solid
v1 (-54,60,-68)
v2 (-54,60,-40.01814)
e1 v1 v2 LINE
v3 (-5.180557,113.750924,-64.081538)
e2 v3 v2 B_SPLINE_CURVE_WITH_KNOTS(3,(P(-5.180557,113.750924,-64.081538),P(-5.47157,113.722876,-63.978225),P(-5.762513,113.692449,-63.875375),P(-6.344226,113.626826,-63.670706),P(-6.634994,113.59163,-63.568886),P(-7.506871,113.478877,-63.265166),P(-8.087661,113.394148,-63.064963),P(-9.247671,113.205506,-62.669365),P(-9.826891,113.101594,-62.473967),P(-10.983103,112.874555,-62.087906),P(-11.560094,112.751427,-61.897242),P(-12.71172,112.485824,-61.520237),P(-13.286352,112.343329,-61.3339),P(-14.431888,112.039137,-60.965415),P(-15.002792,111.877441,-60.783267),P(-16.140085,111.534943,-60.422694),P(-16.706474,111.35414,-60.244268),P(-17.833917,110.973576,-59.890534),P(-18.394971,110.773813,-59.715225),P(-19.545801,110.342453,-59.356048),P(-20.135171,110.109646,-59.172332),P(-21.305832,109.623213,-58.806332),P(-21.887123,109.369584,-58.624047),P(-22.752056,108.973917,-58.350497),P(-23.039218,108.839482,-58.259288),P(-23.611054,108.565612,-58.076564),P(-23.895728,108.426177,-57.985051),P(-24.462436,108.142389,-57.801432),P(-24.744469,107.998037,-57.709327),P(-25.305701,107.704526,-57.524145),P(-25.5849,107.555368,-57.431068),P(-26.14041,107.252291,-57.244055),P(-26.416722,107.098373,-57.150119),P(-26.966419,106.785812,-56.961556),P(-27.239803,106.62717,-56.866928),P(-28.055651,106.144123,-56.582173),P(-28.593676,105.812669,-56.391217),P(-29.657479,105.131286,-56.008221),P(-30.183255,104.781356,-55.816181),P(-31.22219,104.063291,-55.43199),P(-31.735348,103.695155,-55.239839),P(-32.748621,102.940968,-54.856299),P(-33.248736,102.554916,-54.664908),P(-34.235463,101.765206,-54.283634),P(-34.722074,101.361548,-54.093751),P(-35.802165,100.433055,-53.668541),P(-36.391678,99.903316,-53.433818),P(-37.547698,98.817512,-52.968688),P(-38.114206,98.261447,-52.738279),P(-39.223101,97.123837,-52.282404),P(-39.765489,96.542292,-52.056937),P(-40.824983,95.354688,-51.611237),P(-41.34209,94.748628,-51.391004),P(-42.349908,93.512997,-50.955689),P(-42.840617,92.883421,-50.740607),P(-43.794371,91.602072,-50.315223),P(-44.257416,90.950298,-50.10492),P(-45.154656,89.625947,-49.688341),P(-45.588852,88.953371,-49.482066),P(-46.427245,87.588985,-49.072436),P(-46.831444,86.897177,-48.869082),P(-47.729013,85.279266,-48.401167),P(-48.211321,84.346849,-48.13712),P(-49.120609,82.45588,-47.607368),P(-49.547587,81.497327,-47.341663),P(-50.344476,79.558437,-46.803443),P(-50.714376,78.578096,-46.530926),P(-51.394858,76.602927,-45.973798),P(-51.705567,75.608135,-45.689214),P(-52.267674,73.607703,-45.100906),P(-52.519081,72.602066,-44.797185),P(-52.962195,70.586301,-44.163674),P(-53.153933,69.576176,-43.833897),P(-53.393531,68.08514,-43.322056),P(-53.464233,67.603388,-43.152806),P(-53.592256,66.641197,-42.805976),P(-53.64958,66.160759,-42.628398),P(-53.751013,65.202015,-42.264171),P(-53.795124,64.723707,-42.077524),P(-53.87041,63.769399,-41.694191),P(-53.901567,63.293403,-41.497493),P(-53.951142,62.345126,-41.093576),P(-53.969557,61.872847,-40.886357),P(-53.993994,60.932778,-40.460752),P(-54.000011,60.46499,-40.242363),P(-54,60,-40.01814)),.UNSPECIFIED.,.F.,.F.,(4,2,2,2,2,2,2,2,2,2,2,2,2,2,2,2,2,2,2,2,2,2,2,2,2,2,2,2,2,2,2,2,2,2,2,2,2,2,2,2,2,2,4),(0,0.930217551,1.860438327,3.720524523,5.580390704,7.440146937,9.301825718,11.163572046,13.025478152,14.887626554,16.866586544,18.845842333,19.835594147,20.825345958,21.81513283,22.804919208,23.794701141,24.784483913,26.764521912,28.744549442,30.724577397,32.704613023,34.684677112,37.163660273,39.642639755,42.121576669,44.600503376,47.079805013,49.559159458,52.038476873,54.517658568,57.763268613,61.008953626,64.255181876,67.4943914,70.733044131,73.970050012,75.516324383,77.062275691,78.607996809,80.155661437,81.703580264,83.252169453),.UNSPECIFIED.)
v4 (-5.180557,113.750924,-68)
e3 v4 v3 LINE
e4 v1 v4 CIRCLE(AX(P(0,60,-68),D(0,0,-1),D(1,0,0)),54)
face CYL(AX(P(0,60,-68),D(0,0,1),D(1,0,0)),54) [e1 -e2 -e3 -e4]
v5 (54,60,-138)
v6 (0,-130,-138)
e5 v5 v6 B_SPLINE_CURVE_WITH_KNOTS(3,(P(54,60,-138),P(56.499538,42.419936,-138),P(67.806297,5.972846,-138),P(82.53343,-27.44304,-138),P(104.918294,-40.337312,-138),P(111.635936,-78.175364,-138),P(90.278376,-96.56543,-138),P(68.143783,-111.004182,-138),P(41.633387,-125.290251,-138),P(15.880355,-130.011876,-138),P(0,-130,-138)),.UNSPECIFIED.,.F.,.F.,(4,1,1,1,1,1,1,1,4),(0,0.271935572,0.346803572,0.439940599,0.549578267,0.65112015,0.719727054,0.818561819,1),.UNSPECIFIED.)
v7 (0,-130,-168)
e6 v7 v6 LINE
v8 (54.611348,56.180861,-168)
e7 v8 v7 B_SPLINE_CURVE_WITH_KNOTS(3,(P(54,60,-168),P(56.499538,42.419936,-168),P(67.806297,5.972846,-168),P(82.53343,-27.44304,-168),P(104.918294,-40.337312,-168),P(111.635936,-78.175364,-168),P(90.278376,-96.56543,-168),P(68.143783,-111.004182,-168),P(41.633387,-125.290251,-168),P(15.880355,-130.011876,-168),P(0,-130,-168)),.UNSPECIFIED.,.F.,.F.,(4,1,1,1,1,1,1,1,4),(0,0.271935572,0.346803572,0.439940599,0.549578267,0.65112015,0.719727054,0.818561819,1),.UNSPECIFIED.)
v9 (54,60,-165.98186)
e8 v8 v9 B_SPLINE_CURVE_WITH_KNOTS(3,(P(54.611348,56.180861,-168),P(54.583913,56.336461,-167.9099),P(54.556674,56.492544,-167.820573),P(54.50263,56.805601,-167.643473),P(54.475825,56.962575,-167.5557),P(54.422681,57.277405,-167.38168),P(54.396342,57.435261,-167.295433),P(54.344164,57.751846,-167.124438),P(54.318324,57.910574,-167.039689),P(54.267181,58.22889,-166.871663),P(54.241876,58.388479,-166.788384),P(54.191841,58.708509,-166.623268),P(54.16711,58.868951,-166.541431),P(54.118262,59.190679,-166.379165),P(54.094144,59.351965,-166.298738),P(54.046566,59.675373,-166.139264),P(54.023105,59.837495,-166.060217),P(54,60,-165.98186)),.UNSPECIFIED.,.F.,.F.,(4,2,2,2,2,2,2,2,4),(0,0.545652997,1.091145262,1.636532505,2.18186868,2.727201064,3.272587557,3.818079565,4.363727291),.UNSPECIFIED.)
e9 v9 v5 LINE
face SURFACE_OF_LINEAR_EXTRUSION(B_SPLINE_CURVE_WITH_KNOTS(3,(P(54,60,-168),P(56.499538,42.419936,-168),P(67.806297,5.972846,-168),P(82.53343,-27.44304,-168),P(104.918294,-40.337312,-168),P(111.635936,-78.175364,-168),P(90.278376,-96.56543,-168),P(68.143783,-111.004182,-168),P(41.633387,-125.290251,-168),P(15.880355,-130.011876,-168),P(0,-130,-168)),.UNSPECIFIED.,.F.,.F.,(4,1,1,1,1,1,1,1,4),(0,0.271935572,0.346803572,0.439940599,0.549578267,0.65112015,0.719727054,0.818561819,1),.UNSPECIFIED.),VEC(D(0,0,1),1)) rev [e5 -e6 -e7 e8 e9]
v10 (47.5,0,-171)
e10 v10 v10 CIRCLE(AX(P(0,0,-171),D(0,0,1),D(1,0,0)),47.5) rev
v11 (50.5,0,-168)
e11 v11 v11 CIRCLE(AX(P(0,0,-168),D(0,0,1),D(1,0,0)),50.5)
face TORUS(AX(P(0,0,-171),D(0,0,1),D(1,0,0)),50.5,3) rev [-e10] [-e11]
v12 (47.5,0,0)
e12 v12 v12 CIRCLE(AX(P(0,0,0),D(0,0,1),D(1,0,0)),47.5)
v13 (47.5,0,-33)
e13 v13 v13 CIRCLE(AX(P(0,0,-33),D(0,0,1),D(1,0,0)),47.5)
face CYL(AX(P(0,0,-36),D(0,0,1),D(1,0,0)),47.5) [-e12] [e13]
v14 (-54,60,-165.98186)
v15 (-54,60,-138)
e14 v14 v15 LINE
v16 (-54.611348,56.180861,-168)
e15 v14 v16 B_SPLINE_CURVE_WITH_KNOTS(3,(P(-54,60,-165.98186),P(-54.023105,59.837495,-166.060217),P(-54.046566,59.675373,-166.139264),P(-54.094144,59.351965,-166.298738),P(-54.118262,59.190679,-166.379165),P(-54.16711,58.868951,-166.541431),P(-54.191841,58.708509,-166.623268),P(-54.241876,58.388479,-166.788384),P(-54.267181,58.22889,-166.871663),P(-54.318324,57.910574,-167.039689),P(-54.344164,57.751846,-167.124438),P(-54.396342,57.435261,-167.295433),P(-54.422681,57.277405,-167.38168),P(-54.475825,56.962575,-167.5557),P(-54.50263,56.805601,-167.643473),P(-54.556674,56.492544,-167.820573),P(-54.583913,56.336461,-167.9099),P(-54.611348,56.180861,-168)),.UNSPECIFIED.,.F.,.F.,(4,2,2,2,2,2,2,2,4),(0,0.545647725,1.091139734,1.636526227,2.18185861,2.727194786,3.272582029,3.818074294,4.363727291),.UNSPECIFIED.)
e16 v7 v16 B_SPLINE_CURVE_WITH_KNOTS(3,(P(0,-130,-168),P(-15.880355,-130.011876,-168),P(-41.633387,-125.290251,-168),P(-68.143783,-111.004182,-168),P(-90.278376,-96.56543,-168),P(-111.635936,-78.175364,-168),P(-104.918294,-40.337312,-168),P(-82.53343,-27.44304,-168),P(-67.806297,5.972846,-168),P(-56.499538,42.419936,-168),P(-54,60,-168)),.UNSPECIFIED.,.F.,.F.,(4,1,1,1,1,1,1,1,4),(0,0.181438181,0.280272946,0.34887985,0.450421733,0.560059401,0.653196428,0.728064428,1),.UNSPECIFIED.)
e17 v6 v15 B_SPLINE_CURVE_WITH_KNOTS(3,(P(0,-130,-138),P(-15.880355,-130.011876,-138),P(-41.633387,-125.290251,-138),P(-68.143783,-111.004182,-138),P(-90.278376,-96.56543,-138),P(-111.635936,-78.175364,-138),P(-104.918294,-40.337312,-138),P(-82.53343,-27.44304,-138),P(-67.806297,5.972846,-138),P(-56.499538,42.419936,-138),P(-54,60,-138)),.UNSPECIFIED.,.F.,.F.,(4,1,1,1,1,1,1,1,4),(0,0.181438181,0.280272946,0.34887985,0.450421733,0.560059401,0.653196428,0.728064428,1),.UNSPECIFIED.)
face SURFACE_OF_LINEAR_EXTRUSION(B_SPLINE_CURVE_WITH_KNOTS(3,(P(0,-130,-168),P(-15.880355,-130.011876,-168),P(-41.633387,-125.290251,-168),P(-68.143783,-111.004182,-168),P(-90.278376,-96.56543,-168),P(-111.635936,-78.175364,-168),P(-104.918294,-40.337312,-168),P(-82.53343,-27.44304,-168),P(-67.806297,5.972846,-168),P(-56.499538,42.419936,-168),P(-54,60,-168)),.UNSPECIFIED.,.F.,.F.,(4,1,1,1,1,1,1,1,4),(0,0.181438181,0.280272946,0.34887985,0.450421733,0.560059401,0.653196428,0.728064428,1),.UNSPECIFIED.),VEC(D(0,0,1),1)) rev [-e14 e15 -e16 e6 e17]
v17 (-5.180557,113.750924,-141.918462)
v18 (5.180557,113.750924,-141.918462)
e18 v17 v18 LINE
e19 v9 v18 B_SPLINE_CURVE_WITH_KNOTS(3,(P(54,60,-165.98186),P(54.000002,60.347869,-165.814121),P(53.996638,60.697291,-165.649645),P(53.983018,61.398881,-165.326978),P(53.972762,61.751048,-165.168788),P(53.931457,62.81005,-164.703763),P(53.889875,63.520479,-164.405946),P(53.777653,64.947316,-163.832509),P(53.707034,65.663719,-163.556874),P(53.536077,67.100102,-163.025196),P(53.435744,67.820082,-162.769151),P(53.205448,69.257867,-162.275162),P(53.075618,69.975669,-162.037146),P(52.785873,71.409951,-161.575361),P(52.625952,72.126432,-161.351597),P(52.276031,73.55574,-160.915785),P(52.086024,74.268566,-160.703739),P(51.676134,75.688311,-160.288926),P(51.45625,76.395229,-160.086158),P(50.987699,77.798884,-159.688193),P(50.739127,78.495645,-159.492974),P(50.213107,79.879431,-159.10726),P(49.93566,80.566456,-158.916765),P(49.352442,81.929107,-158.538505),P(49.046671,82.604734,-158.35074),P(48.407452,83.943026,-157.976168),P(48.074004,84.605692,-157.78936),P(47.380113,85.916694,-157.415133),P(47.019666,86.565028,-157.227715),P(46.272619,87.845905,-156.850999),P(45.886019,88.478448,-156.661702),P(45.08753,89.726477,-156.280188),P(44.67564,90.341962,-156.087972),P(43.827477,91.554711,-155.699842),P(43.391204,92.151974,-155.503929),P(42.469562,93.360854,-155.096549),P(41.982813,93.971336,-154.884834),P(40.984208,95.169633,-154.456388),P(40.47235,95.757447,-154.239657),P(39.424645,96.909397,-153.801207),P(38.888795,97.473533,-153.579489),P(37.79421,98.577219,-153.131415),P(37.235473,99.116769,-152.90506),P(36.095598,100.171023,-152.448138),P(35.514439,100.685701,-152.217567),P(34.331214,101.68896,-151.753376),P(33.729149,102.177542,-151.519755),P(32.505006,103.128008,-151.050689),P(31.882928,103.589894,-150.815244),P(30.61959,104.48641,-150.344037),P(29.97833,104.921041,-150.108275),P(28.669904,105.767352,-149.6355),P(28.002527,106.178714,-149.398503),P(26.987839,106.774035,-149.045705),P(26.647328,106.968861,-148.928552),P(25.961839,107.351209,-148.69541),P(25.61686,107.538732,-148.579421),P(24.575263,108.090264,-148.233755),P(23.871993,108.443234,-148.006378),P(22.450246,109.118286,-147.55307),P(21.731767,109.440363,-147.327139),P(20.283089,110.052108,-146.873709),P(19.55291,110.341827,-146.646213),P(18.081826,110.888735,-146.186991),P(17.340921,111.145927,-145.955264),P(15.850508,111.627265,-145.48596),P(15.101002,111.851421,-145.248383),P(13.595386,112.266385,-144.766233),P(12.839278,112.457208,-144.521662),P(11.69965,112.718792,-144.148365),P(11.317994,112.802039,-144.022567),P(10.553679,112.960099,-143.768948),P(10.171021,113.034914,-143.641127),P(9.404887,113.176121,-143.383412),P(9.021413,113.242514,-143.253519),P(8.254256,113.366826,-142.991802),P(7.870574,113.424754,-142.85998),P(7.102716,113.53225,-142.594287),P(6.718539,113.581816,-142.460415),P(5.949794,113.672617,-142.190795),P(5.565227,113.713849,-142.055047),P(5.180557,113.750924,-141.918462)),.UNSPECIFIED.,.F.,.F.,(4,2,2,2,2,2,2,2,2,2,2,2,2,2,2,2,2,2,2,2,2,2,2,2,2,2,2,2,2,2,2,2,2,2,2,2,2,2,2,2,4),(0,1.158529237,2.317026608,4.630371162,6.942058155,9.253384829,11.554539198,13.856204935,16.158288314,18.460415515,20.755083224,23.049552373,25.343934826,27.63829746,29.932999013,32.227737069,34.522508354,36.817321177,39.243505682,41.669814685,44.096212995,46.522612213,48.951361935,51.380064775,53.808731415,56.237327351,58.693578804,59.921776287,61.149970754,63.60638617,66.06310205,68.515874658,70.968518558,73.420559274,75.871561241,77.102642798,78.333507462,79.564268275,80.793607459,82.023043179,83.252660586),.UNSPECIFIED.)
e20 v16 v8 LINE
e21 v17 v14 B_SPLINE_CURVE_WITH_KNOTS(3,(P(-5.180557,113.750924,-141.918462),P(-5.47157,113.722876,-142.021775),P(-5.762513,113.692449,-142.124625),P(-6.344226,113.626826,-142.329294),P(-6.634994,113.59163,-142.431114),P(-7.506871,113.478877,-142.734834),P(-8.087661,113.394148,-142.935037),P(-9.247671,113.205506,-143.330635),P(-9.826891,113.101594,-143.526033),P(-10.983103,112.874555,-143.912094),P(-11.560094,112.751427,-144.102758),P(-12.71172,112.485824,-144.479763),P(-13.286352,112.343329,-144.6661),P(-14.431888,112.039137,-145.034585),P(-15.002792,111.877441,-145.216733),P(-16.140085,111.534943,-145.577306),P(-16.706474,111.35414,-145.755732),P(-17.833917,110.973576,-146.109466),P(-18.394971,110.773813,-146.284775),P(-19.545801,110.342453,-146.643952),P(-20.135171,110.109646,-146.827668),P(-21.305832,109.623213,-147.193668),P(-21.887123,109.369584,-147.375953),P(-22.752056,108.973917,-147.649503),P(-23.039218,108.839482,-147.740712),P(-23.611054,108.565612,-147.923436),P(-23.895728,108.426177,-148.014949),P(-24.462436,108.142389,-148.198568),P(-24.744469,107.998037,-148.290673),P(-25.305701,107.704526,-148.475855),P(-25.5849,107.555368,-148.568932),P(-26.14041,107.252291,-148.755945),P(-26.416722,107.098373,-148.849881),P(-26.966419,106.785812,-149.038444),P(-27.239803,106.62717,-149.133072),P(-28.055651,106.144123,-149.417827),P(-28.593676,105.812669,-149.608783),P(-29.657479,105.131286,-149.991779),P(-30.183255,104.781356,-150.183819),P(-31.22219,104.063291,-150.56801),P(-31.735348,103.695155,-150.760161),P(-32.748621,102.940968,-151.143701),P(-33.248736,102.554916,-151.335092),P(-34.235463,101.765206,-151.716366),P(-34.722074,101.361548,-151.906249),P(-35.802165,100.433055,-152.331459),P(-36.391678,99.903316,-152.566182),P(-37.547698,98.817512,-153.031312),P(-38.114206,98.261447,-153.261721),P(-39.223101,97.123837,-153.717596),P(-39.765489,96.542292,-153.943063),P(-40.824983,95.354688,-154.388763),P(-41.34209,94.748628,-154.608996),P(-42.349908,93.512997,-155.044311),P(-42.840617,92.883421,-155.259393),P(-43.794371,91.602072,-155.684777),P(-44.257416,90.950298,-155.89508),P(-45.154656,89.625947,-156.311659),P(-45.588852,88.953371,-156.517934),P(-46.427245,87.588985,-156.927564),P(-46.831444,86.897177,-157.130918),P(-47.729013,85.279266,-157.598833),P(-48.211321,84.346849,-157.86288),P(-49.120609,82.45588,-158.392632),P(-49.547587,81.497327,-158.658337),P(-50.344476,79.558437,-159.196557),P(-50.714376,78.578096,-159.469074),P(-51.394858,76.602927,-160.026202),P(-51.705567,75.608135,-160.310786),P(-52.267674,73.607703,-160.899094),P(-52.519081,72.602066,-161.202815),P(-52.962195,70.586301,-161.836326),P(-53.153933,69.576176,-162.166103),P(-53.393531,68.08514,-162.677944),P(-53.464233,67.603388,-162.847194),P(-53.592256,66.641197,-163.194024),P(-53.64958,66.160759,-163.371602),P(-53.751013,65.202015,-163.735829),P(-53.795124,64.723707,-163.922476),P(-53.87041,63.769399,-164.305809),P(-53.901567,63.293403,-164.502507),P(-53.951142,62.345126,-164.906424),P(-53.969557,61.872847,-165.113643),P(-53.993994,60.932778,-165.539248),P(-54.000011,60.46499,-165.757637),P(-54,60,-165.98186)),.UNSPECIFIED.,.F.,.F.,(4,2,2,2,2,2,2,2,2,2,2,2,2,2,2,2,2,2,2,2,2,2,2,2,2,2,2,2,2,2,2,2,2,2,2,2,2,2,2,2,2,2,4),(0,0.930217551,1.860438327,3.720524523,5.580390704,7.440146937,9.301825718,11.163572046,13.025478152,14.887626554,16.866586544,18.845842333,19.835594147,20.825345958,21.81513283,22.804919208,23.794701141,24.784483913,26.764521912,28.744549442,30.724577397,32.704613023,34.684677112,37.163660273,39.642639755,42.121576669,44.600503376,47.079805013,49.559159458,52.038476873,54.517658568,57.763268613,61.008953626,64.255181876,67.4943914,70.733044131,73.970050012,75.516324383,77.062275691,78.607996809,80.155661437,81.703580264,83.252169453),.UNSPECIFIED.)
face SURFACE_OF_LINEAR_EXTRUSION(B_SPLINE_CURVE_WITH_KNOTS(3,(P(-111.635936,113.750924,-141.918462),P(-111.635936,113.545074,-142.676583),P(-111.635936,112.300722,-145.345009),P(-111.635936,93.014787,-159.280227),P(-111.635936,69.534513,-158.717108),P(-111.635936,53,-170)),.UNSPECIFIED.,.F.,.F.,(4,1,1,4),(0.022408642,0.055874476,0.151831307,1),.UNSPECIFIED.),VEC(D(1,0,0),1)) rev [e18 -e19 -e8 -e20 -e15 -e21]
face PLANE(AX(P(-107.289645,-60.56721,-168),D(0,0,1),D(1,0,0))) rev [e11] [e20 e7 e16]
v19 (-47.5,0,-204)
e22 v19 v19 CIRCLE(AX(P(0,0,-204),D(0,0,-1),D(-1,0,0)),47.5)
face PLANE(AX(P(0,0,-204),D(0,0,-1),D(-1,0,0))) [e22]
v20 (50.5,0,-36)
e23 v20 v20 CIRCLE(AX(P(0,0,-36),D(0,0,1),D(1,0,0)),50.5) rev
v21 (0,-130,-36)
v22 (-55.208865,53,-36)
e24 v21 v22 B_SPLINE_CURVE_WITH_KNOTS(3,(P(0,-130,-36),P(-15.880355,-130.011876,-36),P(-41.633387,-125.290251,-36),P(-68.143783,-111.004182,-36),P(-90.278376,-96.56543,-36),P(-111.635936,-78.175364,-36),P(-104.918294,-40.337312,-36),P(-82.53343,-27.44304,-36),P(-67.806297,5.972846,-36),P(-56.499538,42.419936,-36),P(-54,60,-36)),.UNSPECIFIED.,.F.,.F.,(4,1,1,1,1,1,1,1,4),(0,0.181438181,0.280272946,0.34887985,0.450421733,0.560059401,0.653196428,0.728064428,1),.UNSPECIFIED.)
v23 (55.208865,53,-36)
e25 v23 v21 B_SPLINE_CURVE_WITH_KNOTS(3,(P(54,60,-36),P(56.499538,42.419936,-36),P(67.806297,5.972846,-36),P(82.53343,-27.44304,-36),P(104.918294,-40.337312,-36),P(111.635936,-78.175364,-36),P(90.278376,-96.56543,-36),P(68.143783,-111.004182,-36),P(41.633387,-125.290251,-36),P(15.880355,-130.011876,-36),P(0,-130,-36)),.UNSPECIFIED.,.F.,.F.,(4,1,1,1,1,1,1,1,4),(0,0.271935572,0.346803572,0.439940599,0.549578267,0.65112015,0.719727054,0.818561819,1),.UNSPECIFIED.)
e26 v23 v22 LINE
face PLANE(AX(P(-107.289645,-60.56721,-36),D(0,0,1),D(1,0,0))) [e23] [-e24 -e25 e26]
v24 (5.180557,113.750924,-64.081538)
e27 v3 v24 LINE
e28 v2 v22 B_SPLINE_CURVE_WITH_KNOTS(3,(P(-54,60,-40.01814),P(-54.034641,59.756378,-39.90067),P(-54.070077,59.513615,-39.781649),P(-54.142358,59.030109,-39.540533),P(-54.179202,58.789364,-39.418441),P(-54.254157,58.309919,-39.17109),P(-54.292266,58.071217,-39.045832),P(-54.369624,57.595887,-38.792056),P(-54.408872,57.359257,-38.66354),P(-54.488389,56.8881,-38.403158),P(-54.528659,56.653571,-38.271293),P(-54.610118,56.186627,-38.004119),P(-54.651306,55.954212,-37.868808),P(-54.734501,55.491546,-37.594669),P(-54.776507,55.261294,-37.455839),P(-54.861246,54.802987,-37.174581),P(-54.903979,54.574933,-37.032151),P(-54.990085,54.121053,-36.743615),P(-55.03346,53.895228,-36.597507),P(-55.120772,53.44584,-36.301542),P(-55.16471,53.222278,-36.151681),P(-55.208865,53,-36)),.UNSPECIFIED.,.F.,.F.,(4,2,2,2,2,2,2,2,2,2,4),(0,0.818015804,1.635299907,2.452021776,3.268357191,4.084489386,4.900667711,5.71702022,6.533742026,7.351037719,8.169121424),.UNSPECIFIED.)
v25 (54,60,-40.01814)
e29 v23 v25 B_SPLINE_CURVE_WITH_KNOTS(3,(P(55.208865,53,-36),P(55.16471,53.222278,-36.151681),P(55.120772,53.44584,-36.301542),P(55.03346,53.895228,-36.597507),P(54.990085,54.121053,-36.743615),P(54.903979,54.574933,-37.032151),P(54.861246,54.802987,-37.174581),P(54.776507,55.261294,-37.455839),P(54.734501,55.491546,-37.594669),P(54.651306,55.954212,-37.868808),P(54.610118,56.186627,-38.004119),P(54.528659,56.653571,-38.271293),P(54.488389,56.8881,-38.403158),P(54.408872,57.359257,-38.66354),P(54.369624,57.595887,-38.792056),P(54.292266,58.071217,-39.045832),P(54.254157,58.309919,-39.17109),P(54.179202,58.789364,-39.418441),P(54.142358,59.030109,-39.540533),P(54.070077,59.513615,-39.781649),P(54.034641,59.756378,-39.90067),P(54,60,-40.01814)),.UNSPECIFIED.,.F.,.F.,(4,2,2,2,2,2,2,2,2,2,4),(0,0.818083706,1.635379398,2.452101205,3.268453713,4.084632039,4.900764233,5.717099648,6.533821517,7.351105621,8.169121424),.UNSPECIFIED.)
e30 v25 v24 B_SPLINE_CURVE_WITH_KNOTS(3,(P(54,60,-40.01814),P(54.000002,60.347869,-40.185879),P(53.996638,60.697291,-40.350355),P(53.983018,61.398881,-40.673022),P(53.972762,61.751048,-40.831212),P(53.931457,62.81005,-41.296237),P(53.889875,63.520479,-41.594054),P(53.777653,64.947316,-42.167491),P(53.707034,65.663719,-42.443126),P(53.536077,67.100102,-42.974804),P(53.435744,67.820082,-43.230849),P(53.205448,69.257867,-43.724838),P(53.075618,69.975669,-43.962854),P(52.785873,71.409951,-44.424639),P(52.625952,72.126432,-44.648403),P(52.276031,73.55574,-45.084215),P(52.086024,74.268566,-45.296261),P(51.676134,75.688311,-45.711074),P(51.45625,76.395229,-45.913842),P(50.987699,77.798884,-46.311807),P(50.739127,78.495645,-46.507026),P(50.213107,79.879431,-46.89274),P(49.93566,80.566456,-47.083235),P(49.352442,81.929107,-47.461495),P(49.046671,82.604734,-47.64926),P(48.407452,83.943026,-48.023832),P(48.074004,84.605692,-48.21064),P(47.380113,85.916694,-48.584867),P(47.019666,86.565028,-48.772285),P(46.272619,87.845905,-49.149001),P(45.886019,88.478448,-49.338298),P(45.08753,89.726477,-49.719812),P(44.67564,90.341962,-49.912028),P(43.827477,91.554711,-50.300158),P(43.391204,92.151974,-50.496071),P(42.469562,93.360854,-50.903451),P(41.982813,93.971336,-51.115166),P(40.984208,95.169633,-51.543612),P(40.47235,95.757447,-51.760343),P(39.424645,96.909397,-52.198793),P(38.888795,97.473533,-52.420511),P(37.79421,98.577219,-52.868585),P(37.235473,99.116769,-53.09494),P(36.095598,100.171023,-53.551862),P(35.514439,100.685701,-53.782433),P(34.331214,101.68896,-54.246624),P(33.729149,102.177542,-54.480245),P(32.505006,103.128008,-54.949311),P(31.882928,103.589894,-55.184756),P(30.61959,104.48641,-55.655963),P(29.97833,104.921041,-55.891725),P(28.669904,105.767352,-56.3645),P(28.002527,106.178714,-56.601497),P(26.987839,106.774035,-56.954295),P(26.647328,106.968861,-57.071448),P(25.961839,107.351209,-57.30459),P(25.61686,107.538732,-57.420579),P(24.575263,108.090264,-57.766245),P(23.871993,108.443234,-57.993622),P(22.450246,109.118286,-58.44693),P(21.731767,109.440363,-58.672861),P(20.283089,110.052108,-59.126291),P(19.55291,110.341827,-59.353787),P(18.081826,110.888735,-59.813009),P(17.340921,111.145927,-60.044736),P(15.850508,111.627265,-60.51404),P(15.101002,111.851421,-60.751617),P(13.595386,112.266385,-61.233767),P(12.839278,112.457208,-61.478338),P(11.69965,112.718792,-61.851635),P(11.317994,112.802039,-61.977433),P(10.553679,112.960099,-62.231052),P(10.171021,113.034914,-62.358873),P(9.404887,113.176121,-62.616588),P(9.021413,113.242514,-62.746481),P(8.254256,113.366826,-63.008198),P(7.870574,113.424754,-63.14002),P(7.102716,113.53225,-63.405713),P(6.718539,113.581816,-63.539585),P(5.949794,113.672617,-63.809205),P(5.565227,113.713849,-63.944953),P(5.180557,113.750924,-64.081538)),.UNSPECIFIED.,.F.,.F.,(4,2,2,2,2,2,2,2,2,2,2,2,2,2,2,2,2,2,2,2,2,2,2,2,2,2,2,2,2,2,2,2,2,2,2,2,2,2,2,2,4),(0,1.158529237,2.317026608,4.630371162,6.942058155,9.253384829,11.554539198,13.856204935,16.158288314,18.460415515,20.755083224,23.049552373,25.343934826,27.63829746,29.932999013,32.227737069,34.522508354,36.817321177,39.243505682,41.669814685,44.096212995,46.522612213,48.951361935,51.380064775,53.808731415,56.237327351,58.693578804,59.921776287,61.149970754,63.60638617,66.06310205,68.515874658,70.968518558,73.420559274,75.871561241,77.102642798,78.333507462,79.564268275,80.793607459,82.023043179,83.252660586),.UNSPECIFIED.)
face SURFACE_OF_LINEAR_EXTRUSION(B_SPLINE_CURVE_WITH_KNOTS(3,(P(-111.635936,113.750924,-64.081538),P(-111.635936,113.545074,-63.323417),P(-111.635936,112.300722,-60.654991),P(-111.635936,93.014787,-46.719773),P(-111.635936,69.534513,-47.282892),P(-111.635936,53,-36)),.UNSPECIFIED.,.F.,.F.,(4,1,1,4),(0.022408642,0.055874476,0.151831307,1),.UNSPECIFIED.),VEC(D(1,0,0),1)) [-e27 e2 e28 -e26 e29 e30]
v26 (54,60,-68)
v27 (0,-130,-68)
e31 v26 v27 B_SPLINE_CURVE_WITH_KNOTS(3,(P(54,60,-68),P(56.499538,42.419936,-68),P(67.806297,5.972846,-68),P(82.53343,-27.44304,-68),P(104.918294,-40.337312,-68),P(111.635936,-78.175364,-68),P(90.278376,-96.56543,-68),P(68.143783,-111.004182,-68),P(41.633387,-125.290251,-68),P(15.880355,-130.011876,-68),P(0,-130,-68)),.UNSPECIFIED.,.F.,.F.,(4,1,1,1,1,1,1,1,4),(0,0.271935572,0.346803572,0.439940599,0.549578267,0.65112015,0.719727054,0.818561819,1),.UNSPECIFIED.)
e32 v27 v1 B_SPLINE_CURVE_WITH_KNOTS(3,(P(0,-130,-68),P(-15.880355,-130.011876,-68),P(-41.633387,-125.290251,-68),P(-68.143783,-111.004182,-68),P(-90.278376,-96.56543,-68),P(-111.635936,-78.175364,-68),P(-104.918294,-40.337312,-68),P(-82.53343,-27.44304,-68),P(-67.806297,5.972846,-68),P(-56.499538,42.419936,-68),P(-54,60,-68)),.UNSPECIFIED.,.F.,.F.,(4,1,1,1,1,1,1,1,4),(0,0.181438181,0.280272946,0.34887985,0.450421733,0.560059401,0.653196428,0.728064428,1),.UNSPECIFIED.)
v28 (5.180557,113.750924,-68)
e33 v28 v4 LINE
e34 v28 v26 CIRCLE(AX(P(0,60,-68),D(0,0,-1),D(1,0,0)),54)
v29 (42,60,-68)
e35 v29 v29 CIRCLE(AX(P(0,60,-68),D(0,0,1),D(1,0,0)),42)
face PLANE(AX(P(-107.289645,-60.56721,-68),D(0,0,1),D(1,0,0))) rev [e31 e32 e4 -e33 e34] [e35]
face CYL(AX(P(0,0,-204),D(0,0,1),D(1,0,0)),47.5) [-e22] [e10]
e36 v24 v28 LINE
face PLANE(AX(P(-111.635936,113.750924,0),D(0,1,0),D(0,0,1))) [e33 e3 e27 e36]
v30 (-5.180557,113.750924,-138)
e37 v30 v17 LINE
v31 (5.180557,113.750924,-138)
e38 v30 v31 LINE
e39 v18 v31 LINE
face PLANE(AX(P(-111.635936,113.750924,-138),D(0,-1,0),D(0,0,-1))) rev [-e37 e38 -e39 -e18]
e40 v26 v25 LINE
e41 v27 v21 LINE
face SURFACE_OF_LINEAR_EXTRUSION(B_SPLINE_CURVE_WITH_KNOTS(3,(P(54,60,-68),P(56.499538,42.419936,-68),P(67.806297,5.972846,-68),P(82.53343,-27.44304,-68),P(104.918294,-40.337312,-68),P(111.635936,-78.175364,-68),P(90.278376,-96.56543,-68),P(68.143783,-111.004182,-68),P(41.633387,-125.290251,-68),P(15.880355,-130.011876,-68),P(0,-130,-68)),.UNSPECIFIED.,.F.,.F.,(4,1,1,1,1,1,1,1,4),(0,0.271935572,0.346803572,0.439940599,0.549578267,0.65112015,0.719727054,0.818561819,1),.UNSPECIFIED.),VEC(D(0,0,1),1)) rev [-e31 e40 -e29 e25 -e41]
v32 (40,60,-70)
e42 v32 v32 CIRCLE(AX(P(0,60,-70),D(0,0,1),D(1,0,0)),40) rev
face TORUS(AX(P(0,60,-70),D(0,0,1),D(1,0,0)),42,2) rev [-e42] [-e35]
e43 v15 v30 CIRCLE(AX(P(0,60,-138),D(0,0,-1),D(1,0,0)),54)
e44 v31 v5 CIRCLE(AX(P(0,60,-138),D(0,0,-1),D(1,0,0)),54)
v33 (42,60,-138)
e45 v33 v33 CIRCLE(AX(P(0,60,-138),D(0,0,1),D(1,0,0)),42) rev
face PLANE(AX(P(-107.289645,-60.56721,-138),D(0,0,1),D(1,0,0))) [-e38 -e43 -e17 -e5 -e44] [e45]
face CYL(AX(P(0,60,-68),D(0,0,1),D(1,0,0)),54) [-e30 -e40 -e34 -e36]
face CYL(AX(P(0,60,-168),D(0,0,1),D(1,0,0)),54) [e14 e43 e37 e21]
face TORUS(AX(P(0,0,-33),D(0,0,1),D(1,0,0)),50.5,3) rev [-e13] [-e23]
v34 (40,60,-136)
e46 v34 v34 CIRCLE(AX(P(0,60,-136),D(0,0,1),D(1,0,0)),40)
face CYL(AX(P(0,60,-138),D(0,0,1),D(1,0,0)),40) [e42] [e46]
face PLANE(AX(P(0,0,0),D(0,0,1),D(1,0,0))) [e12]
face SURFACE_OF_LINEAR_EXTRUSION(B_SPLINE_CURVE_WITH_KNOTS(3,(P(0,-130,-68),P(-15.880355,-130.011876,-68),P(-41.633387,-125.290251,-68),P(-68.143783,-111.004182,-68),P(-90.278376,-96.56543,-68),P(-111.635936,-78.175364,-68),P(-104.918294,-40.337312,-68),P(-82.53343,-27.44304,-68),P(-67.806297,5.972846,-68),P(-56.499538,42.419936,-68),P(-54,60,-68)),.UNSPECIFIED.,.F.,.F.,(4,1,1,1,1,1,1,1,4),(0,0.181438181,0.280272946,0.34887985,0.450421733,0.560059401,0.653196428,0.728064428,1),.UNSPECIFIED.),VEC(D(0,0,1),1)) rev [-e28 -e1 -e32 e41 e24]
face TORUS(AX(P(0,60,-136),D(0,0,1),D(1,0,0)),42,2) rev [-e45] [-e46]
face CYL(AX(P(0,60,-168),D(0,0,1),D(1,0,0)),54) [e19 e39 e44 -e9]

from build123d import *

# Parameters (mm, degrees)
SKETCH_1_R          = 47.5
EXTRUDE_1_DEPTH     = 36
EXTRUDE_START       = -68
EXTRUDE_2_DEPTH     = 32
SKETCH_3_R          = 40
EXTRUDE_3_DEPTH     = 70
EXTRUDE_START_2     = 30
EXTRUDE_4_DEPTH     = 30
SKETCH_6_R          = 47.5
EXTRUDE_5_DEPTH     = 36
CUT_EXTRUDE_1_DEPTH = 265.760999654
FILLET_1_R          = 2
FILLET_2_R          = 3


# Read off the part's stored shape, not the designer's step: Бобышка-Вытянуть2
with BuildPart() as part:
    # Эскиз1 → Бобышка-Вытянуть1 (new body)
    with BuildSketch(Plane.XY):
        Circle(SKETCH_1_R)
    extrude(amount=-EXTRUDE_1_DEPTH)

    # Бобышка-Вытянуть2 outline → Бобышка-Вытянуть2 (add)
    with BuildSketch(Plane.XY.offset(EXTRUDE_START)):
        with BuildLine():
            add(Edge.make_bspline(
                [(0, -130), (-15.880354868, -130.01187586), (-41.633386716, -125.290250767), (-68.14378294, -111.004181912), (-90.278376052, -96.565429944), (-111.635936159, -78.175364448), (-104.918293897, -40.337311808), (-82.533429777, -27.443039559), (-67.806297481, 5.97284584), (-56.49953787, 42.419936068), (-54, 60)],
                knots=[0, 0, 0, 0, 0.181438181, 0.280272946, 0.34887985, 0.450421733, 0.560059401, 0.653196428, 0.728064428, 1, 1, 1, 1], degree=3))
            add(Edge.make_bspline(
                [(54, 60), (56.49953787, 42.419936068), (67.806297481, 5.97284584), (82.533429777, -27.443039559), (104.918293897, -40.337311808), (111.635936159, -78.175364448), (90.278376052, -96.565429944), (68.14378294, -111.004181912), (41.633386716, -125.290250767), (15.880354868, -130.01187586), (0, -130)],
                knots=[0, 0, 0, 0, 0.271935572, 0.346803572, 0.439940599, 0.549578267, 0.65112015, 0.719727054, 0.818561819, 1, 1, 1, 1], degree=3))
            ThreePointArc((54, 60), (0, 114), (-54, 60))
        make_face()
    extrude(amount=EXTRUDE_2_DEPTH)

    # Эскиз3 → Бобышка-Вытянуть3 (add)
    with BuildSketch(Plane(origin=(0, 0, -68), x_dir=(-1, 0, 0), z_dir=(0, 0, -1))):
        with Locations(Location((0, 60, 0), (0, 0, 180))):
            Circle(SKETCH_3_R)
    extrude(amount=EXTRUDE_3_DEPTH)

    # Эскиз4 → Бобышка-Вытянуть4 (add)
    with BuildSketch(Plane(origin=(0, 0, -138), x_dir=(-1, 0, 0), z_dir=(0, 0, -1)).offset(EXTRUDE_START_2)):
        with BuildLine():
            ThreePointArc((-54, 60), (0, 114), (54, 60))
            add(Edge.make_bspline(
                [(0, -130), (15.880354868, -130.01187586), (41.633386716, -125.290250767), (68.14378294, -111.004181912), (90.278376052, -96.565429944), (111.635936159, -78.175364448), (104.918293897, -40.337311808), (82.533429777, -27.443039559), (67.806297481, 5.97284584), (56.49953787, 42.419936068), (54, 60)],
                knots=[0, 0, 0, 0, 0.181438181, 0.280272946, 0.34887985, 0.450421733, 0.560059401, 0.653196428, 0.728064428, 1, 1, 1, 1], degree=3))
            add(Edge.make_bspline(
                [(0, -130), (-15.880354868, -130.01187586), (-41.633386716, -125.290250767), (-68.14378294, -111.004181912), (-90.278376052, -96.565429944), (-111.635936159, -78.175364448), (-104.918293897, -40.337311808), (-82.533429777, -27.443039559), (-67.806297481, 5.97284584), (-56.49953787, 42.419936068), (-54, 60)],
                knots=[0, 0, 0, 0, 0.181438181, 0.280272946, 0.34887985, 0.450421733, 0.560059401, 0.653196428, 0.728064428, 1, 1, 1, 1], degree=3))
        make_face()
    extrude(amount=-EXTRUDE_4_DEPTH)

    # Эскиз6 → Бобышка-Вытянуть5 (add)
    with BuildSketch(Plane(origin=(0, 0, -168), x_dir=(-1, 0, 0), z_dir=(0, 0, -1))):
        with Locations(Location((0, 0, 0), (0, 0, 180))):
            Circle(SKETCH_6_R)
    extrude(amount=EXTRUDE_5_DEPTH)

    # Эскиз7 → Вырез-Вытянуть1 (cut, symmetric)
    with BuildSketch(Plane(origin=(0, 0, 0), x_dir=(0, 0, -1), z_dir=(1, 0, 0))):
        with BuildLine():
            Line((27.513510499, 53), (36, 53))
            add(Edge.make_bspline(
                [(64.081537648, 113.750924011), (63.323416805, 113.54507352), (60.654990831, 112.300721999), (46.719773174, 93.014787457), (47.282891804, 69.534512643), (36, 53)],
                knots=[0.022408642, 0.022408642, 0.022408642, 0.022408642, 0.055874476, 0.151831307, 1, 1, 1, 1], degree=3))
            Line((64.081537648, 113.750924011), (68, 113.750924011))
            Line((68, 113.750924011), (68, 121.36125898))
            Line((68, 121.36125898), (27.513510499, 121.36125898))
            Line((27.513510499, 121.36125898), (27.513510499, 53))
        make_face()
        with BuildLine():
            Line((178.486489501, 53), (178.486489501, 121.36125898))
            Line((178.486489501, 121.36125898), (138, 121.36125898))
            Line((138, 121.36125898), (138, 113.750924011))
            Line((138, 113.750924011), (141.918462352, 113.750924011))
            add(Edge.make_bspline(
                [(141.918462352, 113.750924011), (142.676583195, 113.54507352), (145.345009169, 112.300721999), (159.280226826, 93.014787457), (158.717108196, 69.534512643), (170, 53)],
                knots=[0.022408642, 0.022408642, 0.022408642, 0.022408642, 0.055874476, 0.151831307, 1, 1, 1, 1], degree=3))
            Line((170, 53), (178.486489501, 53))
        make_face()
    extrude(amount=CUT_EXTRUDE_1_DEPTH, both=True, mode=Mode.SUBTRACT)

    # Скругление1
    fillet_1_edges = [part.edges().sort_by_distance(p)[0] for p in [
        (-40, 60, -68),
        (-40, 60, -138),
    ]]
    fillet(fillet_1_edges, radius=FILLET_1_R)

    # Скругление2
    fillet_2_edges = [part.edges().sort_by_distance(p)[0] for p in [
        (-47.5, 0, -168),
        (-47.5, 0, -36),
    ]]
    fillet(fillet_2_edges, radius=FILLET_2_R)


solid = part.part
